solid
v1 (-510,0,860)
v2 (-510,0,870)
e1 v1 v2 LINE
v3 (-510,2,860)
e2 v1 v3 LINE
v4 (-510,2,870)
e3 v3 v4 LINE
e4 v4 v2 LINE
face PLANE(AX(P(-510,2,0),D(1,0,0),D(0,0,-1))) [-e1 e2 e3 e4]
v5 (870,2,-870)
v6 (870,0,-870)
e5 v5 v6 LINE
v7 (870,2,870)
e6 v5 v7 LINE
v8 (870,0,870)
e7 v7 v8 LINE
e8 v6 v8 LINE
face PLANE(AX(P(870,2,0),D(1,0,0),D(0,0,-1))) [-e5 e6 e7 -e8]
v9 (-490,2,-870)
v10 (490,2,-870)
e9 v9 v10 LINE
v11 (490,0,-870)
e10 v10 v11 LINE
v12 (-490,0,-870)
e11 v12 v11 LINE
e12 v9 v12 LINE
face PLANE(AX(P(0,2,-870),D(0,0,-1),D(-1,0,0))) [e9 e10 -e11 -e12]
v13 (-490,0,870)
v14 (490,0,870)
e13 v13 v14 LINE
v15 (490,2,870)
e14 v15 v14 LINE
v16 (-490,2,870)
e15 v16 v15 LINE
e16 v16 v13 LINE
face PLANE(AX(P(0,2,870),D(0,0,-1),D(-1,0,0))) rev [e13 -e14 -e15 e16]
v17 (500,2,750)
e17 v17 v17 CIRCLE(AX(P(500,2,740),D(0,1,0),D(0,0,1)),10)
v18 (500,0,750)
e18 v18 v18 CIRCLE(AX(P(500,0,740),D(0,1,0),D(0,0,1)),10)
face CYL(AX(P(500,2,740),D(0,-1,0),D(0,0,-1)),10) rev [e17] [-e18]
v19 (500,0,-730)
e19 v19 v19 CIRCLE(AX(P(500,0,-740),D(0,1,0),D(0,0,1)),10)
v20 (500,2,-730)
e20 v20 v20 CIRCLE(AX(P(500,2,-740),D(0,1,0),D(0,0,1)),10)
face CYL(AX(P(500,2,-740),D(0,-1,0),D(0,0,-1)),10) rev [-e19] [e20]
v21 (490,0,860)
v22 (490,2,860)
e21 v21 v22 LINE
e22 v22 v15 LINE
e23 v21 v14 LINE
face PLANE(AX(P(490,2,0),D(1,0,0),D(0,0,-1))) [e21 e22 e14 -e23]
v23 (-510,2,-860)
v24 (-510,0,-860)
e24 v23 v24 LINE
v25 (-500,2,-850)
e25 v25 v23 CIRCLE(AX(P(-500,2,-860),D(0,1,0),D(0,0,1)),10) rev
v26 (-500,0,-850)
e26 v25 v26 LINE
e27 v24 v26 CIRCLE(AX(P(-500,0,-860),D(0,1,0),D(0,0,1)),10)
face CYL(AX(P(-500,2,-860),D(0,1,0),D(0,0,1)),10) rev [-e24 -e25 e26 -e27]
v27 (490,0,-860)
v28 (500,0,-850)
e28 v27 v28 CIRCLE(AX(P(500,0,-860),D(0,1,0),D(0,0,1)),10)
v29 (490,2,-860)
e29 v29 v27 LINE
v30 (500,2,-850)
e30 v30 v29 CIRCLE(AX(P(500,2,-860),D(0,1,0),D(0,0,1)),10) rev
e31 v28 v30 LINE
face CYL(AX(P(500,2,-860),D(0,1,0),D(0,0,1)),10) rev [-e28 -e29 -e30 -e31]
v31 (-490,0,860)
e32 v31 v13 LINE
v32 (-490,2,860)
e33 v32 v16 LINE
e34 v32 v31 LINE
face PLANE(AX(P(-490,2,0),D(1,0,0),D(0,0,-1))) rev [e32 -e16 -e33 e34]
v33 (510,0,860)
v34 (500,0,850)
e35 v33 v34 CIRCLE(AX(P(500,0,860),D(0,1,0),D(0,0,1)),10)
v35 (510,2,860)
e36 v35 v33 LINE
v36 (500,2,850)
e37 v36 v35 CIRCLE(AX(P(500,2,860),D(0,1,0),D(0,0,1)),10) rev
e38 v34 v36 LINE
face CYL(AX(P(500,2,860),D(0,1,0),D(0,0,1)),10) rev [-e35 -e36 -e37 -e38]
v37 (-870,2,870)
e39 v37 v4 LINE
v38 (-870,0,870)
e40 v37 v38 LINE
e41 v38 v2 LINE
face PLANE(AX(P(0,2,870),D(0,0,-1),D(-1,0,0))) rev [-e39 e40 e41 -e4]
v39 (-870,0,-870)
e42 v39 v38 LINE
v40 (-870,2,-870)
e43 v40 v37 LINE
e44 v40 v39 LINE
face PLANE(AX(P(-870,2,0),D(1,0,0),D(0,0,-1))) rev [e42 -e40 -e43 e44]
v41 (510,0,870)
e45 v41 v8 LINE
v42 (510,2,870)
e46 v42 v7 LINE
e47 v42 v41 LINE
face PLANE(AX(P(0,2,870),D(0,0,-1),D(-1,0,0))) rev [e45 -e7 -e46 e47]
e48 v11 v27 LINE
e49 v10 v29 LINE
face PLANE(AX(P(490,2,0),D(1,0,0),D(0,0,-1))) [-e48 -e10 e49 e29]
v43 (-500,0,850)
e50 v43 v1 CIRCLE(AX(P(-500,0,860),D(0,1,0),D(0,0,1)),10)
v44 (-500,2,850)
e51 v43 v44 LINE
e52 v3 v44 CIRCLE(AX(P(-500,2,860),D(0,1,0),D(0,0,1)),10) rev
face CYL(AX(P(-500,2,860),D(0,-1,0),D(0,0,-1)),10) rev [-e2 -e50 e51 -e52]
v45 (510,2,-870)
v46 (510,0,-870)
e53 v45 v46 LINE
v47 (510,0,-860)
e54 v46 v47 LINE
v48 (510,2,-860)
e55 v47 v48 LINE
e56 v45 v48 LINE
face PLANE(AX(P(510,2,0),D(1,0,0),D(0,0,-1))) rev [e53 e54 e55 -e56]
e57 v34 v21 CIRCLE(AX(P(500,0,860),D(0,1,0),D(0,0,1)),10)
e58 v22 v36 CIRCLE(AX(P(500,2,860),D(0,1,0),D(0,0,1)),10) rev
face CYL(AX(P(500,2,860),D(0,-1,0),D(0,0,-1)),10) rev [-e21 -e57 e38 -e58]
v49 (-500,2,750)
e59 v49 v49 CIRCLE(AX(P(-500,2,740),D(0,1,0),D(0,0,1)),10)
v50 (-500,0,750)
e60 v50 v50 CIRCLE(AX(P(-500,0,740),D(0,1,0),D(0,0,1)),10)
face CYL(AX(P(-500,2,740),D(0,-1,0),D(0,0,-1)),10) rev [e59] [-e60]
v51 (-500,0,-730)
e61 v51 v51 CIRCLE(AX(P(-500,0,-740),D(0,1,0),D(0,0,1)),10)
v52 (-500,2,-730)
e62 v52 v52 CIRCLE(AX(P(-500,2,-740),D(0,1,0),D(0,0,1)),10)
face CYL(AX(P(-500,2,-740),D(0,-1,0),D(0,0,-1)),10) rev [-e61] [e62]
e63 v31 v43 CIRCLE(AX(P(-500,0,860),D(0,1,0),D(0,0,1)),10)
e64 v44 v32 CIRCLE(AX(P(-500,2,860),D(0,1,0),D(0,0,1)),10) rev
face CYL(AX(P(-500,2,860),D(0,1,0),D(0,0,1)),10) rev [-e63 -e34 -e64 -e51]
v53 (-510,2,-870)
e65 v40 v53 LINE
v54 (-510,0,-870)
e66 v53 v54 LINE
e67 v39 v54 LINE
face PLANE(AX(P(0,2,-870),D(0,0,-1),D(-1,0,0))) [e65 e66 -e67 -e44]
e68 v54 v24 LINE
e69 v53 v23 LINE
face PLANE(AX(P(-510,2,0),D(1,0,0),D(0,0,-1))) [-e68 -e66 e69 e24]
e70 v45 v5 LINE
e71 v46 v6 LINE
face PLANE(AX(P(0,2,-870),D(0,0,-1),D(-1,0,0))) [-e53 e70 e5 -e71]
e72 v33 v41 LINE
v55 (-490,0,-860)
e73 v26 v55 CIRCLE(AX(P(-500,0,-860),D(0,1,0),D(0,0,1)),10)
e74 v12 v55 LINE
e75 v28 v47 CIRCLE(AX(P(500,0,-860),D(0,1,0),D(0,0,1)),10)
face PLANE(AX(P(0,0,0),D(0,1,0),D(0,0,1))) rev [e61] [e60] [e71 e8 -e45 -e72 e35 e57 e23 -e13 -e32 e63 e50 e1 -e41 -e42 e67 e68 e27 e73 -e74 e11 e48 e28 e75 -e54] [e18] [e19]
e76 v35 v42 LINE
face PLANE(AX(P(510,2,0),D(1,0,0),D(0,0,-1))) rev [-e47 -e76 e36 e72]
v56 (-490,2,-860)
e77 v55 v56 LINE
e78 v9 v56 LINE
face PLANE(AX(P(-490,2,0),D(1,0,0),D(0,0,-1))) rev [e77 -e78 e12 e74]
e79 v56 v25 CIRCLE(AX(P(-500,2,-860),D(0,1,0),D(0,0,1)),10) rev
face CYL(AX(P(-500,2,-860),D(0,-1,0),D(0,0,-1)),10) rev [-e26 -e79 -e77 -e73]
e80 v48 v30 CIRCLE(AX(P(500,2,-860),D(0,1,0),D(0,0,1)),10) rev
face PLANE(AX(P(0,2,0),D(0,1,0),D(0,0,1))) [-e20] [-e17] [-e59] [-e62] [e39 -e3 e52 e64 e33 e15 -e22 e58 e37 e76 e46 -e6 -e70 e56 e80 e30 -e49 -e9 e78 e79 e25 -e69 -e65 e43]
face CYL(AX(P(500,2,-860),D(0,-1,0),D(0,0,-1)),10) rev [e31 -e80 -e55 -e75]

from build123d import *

# Parameters (mm, degrees)
SKETCH1_R           = 10
BOSS_EXTRUDE1_DEPTH = 2
FILLET1_R           = 10


with BuildPart() as part:
    # Sketch1 → Boss-Extrude1 (new body)
    with BuildSketch(Plane(origin=(0, 0, 0), x_dir=(1, 0, 0), z_dir=(0, 1, 0))):
        Polygon((490, -850), (490, -870), (-490, -870), (-490, -850), (-510, -850), (-510, -870), (-870, -870), (-870, 870), (-510, 870), (-510, 850), (-490, 850), (-490, 870), (490, 870), (490, 850), (510, 850), (510, 870), (870, 870), (870, -870), (510, -870), (510, -850), align=None)
        with Locations(Location((-500, 740, 0), (0, 0, 270))):
            Circle(SKETCH1_R, mode=Mode.SUBTRACT)
        with Locations(Location((500, 740, 0), (0, 0, 270))):
            Circle(SKETCH1_R, mode=Mode.SUBTRACT)
        with Locations(Location((500, -740, 0), (0, 0, 270))):
            Circle(SKETCH1_R, mode=Mode.SUBTRACT)
        with Locations(Location((-500, -740, 0), (0, 0, 270))):
            Circle(SKETCH1_R, mode=Mode.SUBTRACT)
    extrude(amount=BOSS_EXTRUDE1_DEPTH)

    # Fillet1
    fillet1_edges = [part.edges().sort_by_distance(p)[0] for p in [
        (490, 1, 850),
        (510, 1, 850),
        (-510, 1, 850),
        (-490, 1, 850),
        (510, 1, -850),
        (490, 1, -850),
        (-510, 1, -850),
        (-490, 1, -850),
    ]]
    fillet(fillet1_edges, radius=FILLET1_R - 0.0001)  # a hair under: the kernel refuses the full size


solid = part.part
